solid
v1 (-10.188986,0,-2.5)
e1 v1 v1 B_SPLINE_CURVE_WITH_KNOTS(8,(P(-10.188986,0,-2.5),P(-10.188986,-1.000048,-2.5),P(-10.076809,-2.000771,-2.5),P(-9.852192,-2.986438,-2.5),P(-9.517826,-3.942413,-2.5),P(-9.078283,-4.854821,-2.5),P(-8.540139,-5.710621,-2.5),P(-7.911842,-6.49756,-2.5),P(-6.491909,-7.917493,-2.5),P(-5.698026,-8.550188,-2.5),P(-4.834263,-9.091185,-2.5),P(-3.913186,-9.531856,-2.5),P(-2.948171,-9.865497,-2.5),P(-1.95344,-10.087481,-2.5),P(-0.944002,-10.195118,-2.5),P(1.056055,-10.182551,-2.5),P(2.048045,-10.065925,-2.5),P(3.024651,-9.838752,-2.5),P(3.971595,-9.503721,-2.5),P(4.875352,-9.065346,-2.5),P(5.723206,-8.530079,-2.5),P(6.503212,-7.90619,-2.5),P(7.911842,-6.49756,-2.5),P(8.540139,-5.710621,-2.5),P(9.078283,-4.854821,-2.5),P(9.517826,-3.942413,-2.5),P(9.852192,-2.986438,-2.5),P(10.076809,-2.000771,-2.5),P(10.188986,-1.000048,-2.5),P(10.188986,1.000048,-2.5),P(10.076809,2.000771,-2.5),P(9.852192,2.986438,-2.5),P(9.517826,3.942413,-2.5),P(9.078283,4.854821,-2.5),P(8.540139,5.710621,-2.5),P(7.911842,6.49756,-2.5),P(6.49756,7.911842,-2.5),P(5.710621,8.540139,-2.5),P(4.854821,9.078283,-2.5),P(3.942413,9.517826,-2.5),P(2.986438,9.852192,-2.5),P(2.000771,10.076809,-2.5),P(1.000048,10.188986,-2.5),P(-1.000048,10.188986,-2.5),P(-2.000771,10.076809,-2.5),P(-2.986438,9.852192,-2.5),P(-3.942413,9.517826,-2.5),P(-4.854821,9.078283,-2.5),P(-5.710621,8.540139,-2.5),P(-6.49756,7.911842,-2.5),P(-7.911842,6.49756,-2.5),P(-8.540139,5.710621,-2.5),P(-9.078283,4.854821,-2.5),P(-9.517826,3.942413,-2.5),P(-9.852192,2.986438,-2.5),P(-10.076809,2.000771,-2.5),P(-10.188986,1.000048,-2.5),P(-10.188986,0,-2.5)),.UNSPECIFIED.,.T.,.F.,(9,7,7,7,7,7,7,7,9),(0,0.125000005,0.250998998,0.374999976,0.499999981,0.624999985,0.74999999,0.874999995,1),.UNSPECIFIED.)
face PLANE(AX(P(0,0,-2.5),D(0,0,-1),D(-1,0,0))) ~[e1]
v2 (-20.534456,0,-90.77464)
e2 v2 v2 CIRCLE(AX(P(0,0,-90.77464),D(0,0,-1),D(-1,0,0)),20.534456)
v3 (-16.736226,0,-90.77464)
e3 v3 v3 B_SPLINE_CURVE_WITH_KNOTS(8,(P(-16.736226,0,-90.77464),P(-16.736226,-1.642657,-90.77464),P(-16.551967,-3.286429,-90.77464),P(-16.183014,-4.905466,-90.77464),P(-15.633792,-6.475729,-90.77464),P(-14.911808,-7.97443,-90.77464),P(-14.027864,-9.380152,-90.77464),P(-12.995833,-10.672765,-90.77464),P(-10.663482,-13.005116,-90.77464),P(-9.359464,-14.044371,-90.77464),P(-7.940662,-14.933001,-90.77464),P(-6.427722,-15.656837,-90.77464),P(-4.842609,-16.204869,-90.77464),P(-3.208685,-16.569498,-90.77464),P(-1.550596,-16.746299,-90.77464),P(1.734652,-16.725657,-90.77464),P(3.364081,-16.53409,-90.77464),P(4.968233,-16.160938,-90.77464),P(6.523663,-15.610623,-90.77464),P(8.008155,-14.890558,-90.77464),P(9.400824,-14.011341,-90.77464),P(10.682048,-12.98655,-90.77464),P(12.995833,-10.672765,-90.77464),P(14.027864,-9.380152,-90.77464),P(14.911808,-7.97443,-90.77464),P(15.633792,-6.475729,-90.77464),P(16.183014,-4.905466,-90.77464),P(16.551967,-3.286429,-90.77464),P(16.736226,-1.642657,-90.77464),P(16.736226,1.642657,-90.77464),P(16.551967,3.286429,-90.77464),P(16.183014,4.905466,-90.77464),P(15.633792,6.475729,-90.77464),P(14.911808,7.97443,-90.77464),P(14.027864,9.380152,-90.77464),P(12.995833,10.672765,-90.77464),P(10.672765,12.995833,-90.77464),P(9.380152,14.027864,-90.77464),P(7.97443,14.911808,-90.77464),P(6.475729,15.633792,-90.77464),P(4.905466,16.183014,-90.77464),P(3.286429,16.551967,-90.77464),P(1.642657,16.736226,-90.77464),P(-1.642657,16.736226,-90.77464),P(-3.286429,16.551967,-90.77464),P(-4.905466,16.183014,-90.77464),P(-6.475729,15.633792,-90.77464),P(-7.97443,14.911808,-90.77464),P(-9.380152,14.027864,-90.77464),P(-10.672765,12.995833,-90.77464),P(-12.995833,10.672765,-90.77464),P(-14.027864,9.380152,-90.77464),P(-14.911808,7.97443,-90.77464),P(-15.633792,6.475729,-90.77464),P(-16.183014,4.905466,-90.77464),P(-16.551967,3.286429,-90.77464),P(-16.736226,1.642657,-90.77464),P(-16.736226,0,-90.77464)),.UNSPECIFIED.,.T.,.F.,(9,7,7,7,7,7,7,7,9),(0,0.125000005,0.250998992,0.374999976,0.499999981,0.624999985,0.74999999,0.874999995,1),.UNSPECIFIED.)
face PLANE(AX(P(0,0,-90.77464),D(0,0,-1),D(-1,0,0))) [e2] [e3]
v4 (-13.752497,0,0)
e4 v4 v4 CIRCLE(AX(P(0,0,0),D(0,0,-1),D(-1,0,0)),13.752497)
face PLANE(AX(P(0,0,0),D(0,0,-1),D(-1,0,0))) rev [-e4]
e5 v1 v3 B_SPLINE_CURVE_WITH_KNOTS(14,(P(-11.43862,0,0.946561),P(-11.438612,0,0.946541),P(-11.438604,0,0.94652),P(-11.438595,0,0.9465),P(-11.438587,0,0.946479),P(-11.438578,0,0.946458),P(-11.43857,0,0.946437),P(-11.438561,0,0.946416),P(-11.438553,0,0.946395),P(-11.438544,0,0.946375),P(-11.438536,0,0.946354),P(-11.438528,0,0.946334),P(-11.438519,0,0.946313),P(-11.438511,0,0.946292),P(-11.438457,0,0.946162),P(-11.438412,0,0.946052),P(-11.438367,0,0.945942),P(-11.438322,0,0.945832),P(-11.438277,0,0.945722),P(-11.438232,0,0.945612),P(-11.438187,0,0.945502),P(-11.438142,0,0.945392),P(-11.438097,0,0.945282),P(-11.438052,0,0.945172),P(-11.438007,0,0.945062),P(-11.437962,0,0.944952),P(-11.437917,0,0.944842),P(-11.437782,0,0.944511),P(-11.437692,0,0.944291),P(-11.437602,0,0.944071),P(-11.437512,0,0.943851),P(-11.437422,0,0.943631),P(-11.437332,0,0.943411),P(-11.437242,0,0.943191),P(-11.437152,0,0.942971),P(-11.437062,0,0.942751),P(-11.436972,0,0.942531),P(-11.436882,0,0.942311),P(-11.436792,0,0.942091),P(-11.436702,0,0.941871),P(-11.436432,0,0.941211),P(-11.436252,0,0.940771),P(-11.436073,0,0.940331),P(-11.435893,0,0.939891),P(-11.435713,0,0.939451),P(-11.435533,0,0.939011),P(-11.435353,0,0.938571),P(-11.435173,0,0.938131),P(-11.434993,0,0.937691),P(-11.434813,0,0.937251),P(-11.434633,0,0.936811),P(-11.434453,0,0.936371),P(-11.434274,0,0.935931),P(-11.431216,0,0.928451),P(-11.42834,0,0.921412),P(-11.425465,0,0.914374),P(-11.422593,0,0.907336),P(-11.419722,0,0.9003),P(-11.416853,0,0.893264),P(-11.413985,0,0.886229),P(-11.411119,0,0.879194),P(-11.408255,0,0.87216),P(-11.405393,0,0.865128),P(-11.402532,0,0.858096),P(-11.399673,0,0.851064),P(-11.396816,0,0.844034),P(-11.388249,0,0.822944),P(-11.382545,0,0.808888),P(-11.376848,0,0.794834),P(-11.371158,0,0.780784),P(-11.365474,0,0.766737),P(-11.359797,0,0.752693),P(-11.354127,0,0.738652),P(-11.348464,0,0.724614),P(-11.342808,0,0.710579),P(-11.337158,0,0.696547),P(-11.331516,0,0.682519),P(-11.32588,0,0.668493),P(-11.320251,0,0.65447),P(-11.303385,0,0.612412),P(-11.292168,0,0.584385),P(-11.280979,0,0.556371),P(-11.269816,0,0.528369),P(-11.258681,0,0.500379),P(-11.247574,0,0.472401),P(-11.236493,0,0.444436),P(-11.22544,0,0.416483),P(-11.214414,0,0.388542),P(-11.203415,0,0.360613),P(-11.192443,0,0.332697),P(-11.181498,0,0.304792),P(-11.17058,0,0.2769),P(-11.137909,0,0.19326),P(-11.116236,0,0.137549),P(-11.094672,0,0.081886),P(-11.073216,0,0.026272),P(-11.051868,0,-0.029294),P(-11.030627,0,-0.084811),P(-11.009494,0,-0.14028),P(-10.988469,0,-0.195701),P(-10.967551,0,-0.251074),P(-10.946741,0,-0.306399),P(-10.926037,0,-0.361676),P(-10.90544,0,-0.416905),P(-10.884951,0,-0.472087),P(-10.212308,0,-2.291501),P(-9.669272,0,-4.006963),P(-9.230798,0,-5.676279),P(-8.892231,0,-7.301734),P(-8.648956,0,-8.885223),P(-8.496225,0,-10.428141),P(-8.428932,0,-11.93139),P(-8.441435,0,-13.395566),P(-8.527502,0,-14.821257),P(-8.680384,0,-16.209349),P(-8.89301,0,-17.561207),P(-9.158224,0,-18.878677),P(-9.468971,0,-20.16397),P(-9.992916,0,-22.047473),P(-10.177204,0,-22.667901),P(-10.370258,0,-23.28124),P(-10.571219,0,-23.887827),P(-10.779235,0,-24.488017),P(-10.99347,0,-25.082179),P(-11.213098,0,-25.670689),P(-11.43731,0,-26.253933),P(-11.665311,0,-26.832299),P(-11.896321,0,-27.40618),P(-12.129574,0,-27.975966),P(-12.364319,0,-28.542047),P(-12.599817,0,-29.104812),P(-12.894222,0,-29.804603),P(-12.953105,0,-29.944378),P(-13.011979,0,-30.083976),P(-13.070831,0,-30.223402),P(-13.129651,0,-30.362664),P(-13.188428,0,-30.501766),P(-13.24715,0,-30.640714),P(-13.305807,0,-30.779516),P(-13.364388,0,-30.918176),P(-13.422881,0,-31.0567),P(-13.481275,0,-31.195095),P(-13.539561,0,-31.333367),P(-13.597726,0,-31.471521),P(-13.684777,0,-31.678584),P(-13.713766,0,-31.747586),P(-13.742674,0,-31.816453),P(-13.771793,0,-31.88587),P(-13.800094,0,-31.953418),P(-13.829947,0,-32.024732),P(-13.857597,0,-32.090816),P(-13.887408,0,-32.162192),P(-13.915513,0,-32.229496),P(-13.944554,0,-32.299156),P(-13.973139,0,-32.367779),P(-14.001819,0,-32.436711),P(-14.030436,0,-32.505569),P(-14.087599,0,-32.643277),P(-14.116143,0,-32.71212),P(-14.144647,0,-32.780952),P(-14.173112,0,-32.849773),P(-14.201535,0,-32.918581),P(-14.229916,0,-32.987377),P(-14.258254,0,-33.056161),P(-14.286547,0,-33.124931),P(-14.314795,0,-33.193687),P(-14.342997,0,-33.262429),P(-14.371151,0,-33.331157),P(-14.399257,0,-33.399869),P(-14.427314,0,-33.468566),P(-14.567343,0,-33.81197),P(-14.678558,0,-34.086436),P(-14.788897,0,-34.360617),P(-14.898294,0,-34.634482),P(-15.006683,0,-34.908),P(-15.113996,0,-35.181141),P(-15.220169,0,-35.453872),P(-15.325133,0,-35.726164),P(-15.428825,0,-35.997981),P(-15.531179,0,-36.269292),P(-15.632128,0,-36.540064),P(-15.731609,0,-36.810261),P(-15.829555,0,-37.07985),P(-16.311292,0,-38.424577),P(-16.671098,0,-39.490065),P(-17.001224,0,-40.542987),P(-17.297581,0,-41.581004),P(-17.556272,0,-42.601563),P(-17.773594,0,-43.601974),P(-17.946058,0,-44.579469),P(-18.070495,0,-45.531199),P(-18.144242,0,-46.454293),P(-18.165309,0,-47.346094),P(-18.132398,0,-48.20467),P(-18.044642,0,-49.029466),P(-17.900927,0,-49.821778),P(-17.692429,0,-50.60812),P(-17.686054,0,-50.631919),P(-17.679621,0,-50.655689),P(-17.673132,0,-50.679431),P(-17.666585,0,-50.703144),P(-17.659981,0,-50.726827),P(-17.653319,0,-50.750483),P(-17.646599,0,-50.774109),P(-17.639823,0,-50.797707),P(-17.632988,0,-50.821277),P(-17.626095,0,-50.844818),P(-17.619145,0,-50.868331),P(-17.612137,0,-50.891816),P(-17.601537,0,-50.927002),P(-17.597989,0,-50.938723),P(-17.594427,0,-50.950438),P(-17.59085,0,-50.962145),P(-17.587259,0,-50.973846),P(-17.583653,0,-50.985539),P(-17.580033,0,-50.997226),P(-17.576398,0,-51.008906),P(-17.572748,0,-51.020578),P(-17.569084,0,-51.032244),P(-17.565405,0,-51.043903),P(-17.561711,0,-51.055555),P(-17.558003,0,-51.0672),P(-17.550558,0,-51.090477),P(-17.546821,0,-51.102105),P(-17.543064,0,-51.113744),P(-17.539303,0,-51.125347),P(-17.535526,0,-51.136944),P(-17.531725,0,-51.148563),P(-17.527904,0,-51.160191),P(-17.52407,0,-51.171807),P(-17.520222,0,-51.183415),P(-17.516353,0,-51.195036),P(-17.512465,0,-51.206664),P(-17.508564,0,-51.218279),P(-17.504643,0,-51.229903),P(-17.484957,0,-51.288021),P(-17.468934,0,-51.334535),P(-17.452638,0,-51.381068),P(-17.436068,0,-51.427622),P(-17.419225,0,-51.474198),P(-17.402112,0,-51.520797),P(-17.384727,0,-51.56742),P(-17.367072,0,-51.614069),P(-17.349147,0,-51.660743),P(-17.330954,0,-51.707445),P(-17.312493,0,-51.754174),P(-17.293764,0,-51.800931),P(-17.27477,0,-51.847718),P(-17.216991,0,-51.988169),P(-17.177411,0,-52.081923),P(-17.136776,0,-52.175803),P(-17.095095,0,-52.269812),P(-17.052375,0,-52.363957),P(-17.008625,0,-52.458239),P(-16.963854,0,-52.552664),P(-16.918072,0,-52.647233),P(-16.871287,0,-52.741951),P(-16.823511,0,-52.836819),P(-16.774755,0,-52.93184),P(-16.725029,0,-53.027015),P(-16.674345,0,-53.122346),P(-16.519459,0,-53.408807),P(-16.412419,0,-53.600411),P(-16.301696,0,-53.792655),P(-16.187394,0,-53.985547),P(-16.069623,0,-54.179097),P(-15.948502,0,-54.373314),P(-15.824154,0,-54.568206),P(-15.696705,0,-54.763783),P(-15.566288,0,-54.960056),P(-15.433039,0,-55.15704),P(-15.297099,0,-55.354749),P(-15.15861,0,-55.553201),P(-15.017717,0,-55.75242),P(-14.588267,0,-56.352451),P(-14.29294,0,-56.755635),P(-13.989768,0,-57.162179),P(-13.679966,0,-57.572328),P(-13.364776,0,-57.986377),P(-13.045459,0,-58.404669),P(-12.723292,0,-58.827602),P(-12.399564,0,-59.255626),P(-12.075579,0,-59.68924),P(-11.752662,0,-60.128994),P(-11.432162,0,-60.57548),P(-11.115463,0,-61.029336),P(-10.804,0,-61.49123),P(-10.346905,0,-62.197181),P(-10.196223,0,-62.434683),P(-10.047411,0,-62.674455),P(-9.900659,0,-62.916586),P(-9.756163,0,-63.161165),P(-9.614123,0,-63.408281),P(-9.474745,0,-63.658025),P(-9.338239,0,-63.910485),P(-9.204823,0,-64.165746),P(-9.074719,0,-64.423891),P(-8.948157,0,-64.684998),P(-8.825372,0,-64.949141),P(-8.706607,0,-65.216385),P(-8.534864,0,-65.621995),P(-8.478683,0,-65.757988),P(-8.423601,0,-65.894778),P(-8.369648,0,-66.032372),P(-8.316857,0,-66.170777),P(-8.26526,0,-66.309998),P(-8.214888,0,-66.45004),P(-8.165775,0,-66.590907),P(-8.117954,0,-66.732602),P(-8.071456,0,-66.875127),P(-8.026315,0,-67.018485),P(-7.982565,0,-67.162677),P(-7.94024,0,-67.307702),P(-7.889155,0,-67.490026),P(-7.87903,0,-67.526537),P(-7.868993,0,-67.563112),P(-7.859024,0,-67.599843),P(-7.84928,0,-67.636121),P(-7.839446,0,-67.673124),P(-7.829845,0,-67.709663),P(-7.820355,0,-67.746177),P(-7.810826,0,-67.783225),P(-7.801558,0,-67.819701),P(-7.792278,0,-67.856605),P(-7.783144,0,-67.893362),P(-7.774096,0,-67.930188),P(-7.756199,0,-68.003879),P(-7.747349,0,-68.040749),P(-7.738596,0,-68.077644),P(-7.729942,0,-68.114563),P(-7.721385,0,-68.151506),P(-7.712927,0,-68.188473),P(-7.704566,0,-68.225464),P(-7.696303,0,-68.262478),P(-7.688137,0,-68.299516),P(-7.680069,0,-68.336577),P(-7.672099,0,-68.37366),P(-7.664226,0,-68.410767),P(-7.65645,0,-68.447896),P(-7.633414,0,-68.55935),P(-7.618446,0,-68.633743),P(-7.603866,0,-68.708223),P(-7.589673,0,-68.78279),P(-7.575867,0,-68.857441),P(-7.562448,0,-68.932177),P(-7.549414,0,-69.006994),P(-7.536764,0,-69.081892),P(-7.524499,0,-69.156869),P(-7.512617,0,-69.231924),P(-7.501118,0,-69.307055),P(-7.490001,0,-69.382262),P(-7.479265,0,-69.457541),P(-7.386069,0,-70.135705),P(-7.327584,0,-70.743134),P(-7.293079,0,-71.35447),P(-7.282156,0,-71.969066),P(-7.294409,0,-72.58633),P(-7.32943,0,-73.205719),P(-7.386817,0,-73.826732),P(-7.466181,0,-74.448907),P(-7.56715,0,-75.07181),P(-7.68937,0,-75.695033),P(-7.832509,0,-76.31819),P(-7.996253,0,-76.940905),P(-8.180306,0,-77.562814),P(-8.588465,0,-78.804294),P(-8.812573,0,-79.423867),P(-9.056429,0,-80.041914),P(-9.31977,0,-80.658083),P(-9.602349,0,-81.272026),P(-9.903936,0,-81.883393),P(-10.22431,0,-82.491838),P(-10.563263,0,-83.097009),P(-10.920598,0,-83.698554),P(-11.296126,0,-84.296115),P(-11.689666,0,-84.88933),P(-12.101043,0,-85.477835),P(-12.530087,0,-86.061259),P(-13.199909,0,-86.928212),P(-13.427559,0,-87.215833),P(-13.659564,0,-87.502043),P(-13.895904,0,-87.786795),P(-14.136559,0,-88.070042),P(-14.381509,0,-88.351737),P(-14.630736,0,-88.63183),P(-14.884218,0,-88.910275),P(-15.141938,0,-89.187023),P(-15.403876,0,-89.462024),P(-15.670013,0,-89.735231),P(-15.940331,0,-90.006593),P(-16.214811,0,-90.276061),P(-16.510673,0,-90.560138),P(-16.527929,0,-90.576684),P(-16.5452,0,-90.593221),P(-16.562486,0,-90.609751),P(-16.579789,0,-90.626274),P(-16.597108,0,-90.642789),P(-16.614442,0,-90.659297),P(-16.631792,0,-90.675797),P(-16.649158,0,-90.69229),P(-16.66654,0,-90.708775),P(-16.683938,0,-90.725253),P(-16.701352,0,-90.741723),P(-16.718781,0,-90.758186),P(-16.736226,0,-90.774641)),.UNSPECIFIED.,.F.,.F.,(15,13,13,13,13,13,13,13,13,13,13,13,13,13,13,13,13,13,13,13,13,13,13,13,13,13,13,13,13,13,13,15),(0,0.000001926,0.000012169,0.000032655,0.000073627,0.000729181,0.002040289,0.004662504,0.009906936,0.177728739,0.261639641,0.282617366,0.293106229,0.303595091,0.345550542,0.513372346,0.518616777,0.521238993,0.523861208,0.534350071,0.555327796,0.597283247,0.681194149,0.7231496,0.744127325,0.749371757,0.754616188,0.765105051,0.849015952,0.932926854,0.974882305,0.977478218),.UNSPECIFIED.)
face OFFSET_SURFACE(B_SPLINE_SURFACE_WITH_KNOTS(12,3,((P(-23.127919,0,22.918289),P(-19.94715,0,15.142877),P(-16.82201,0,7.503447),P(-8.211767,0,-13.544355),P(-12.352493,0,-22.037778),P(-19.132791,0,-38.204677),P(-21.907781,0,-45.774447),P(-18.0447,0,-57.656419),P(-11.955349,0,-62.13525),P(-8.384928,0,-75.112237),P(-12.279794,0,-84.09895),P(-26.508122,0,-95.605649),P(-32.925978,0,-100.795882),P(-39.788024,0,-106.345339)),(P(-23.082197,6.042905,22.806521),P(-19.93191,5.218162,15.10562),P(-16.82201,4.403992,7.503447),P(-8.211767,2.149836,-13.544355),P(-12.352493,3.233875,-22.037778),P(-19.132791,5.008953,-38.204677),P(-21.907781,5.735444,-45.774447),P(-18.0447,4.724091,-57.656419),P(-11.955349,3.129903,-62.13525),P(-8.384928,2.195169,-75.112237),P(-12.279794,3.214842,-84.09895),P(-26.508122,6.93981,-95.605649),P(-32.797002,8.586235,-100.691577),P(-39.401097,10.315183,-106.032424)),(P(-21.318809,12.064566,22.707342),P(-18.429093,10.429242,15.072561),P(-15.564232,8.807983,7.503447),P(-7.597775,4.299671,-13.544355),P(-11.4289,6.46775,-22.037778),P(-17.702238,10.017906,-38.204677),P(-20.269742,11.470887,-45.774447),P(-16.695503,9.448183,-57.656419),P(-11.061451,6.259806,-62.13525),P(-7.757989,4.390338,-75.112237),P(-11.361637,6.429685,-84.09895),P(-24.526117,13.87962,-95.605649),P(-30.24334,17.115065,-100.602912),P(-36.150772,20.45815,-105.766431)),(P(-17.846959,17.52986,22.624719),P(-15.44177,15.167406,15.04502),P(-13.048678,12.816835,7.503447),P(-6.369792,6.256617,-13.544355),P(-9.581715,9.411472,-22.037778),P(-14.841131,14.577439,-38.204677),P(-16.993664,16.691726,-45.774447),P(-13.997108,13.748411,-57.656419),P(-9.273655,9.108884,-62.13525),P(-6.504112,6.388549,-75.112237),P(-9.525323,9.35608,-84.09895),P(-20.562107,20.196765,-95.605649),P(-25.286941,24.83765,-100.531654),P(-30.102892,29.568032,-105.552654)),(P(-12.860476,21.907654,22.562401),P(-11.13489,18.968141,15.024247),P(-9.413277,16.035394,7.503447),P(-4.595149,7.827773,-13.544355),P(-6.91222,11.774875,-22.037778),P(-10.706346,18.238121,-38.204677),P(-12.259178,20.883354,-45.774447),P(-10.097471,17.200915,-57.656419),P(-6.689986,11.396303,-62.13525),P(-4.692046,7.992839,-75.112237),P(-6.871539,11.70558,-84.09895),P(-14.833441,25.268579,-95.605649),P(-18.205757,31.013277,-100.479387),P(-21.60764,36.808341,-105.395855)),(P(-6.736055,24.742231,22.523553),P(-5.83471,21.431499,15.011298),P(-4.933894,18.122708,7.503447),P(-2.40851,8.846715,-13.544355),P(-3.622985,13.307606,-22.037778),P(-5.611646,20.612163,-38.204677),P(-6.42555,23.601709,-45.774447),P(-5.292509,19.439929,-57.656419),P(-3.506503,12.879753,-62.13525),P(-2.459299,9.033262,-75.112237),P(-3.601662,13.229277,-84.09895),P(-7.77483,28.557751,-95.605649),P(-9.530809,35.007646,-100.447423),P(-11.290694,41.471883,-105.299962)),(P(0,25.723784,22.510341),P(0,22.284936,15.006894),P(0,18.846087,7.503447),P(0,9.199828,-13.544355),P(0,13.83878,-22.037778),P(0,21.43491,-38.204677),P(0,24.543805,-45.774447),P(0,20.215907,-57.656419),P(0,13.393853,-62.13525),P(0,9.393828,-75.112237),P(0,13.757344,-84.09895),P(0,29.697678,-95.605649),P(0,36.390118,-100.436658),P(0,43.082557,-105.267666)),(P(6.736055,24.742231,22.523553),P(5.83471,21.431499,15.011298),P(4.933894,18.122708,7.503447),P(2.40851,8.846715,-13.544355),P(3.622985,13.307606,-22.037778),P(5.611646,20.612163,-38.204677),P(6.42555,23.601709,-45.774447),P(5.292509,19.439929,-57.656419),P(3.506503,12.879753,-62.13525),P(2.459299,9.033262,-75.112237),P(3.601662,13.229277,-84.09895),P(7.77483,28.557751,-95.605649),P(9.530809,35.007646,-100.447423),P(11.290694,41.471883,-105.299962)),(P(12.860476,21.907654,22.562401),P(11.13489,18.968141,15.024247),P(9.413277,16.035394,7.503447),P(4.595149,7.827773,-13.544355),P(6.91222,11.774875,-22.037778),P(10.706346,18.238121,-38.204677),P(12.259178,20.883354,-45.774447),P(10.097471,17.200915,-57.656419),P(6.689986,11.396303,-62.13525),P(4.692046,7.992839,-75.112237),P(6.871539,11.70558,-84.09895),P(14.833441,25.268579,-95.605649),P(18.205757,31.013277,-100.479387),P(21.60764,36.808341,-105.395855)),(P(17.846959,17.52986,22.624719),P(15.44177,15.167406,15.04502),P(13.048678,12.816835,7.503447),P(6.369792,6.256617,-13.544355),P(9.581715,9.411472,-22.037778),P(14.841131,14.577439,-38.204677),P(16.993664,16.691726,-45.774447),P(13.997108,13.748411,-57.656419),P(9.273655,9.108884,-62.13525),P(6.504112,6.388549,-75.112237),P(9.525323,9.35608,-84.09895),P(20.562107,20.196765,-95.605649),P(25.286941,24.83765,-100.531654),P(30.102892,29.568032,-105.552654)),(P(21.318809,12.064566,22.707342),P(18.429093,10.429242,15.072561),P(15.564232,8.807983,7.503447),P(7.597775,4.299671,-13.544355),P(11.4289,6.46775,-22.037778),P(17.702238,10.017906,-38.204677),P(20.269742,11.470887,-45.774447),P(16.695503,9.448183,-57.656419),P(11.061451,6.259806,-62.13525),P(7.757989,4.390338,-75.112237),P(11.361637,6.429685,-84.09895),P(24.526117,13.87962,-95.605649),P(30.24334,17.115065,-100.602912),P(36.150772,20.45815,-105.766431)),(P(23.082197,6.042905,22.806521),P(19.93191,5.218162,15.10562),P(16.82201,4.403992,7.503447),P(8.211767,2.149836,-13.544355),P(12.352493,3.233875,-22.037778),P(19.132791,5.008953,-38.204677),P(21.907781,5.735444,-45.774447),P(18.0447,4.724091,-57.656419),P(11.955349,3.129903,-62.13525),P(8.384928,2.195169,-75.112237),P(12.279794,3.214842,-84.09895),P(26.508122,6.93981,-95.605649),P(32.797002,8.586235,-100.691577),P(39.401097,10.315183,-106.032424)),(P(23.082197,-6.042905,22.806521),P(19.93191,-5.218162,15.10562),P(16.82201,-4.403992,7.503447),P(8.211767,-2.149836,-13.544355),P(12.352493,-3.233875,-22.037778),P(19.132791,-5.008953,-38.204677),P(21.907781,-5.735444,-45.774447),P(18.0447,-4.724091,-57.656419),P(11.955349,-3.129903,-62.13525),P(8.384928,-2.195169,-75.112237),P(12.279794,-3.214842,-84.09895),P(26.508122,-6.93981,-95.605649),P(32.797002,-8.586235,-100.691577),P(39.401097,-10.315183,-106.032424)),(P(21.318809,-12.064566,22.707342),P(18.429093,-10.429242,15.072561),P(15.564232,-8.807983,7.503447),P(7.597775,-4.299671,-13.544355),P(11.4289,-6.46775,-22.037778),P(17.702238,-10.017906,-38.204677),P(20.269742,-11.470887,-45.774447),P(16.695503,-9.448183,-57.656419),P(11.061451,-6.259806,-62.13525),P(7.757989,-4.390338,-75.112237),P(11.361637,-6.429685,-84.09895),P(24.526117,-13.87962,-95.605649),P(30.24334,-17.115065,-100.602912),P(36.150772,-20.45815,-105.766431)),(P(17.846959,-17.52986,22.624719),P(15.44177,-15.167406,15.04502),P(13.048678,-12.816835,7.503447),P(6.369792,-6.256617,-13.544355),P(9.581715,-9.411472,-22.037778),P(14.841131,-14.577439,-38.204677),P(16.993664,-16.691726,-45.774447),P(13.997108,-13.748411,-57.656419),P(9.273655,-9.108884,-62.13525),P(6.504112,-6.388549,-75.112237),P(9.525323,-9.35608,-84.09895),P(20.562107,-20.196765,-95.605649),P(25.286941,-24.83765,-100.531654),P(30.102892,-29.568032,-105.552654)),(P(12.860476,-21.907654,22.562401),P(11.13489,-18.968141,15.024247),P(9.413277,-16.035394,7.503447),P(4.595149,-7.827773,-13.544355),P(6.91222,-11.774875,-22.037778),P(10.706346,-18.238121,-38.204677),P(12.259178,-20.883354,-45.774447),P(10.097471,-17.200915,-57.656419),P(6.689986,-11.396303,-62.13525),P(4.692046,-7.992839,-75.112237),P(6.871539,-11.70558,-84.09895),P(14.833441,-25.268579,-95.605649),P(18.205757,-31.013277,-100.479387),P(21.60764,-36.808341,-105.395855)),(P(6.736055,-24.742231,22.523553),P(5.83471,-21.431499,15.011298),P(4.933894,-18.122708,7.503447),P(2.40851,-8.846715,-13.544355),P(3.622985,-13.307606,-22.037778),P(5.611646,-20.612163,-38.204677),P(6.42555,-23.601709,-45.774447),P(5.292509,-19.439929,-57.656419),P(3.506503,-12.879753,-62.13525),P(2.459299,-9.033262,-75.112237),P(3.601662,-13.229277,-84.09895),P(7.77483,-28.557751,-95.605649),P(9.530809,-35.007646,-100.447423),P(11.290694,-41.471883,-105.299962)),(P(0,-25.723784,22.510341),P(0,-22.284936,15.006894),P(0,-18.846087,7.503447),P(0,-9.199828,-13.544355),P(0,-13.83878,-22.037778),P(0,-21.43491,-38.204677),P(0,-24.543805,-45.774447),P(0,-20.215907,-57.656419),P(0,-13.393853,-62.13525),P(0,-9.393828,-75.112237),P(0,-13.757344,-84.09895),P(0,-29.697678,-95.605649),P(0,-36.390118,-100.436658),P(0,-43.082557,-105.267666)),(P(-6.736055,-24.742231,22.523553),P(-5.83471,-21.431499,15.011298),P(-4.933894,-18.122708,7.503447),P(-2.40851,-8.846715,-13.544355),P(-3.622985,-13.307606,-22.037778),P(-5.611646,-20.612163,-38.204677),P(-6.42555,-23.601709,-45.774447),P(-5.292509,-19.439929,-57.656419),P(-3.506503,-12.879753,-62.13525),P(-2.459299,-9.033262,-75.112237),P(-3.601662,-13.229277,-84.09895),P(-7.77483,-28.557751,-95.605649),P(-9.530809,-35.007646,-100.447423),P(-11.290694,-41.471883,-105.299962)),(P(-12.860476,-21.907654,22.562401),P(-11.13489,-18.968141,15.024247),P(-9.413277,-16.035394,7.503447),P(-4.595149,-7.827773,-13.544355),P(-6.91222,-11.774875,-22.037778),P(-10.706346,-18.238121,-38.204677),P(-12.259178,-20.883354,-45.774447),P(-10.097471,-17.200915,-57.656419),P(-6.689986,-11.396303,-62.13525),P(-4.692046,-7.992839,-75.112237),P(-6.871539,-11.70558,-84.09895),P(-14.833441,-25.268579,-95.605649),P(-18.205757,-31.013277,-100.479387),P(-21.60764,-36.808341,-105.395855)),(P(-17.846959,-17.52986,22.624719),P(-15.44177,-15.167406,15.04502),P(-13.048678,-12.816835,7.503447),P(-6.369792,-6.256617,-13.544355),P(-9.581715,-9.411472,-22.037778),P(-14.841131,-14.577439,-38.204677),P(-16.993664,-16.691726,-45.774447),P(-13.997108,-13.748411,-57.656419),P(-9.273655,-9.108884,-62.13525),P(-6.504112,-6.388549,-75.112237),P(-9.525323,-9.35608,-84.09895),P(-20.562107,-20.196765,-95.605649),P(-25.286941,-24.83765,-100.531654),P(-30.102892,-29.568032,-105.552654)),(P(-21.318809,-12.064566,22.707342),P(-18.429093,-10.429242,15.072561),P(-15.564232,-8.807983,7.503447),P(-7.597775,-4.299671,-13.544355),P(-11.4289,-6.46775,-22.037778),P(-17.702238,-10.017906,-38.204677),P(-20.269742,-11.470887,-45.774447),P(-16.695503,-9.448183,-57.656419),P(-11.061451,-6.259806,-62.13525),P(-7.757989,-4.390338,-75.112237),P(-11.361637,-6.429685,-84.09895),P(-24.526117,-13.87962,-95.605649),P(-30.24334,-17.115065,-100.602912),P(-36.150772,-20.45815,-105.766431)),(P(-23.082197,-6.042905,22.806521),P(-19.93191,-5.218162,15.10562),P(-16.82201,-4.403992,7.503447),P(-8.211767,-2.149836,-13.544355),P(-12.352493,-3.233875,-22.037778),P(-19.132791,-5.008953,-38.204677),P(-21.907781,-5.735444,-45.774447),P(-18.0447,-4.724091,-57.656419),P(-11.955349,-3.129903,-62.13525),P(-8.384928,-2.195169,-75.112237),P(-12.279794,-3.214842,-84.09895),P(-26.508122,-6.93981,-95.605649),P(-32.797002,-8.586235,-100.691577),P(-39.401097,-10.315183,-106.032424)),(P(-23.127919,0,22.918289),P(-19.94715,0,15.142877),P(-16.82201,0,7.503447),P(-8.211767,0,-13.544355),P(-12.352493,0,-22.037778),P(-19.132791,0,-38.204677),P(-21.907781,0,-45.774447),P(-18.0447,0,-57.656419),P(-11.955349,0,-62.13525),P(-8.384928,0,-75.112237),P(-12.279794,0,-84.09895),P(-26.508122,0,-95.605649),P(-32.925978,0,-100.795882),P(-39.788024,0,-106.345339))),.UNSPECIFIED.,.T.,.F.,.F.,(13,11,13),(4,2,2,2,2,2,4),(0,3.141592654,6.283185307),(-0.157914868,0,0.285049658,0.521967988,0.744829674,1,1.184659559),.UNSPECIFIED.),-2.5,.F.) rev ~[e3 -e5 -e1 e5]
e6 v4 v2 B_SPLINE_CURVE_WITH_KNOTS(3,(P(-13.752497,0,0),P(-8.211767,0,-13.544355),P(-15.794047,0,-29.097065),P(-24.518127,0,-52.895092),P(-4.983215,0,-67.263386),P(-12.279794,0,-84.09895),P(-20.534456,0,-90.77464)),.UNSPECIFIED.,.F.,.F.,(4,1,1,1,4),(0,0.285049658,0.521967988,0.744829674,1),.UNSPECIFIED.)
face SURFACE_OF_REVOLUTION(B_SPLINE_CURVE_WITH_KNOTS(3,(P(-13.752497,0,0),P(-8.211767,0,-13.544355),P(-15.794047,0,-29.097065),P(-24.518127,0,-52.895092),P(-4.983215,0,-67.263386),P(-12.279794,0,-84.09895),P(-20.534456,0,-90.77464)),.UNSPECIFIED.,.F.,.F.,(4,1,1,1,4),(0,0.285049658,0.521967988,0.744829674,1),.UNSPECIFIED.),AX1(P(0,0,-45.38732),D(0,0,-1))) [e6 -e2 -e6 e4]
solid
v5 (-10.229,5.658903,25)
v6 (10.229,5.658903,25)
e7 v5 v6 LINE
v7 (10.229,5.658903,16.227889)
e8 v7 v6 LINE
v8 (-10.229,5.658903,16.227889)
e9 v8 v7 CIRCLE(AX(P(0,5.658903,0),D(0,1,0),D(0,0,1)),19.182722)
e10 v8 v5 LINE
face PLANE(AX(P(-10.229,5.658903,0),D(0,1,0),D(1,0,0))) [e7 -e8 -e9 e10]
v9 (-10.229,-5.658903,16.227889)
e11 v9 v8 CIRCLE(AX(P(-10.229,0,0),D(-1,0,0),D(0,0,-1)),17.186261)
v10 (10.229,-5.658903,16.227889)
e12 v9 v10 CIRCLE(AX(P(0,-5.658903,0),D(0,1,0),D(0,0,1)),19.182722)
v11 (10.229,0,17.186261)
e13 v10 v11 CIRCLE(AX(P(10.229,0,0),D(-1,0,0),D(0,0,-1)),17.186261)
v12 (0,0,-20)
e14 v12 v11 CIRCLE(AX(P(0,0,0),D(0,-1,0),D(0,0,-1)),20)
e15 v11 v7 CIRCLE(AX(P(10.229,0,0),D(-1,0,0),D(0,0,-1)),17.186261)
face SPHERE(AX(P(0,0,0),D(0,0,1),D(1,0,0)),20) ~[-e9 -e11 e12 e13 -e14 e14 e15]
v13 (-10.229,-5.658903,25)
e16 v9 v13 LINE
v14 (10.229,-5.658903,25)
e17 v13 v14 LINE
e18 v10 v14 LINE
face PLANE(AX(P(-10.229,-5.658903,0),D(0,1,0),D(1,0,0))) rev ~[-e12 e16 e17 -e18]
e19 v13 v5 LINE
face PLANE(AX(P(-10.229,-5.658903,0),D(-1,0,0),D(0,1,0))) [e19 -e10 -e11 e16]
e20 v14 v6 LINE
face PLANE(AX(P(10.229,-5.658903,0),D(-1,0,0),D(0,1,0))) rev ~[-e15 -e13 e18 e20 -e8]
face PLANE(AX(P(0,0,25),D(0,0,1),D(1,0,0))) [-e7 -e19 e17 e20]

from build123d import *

# Parameters (mm, degrees)
F2_W     = 20.458
F2_H     = 11.3178063184
F3_DEPTH = 25
F10_T    = -2.5


# Not quite as in the source:
# - the program builds the solid bodies; features that only make, move or delete a surface that nothing else refers to are left out


with BuildPart() as f1:
    # F0 (on Front) → F1 (revolve)
    with BuildSketch(Plane.XZ):
        with BuildLine():
            Line((0, 20), (0, -20))
            ThreePointArc((0, -20), (20, 0), (0, 20))
        make_face()
    revolve(axis=Axis((0, 0, 0), (0, 0, -1)))

    # F2 (on Top) → F3 (join)
    with BuildSketch(Plane.XY):
        Rectangle(F2_W, F2_H)
    extrude(amount=F3_DEPTH)


with BuildPart() as f5:
    # F4 (on Front) → F5 (revolve)
    with BuildSketch(Plane.XZ):
        with BuildLine():
            Line((0, 0), (-13.7524965748, 0))
            add(Edge.make_bspline(
                [(-13.7524965748, 0), (-8.2117667219, -13.5443547456), (-15.7940470288, -29.097065496), (-24.5181266702, -52.895092497), (-4.983214771, -67.2633857979), (-12.2797935148, -84.0989501471), (-20.5344557762, -90.7746404409)],
                knots=[0, 0, 0, 0, 0.2850496582, 0.5219679881, 0.7448296737, 1, 1, 1, 1], degree=3))
            Line((-20.5344557762, -90.7746404409), (0, -90.7746404409))
            Line((0, -90.7746404409), (0, 0))
        make_face()
    revolve(axis=Axis((0, 0, -45.3873202205), (0, 0, -1)))

    # F10
    f10_openings = [f5.faces().sort_by_distance(p)[0] for p in [
        (0, 0, -90.77464),
    ]]
    offset(amount=F10_T, openings=f10_openings)


solid = Compound([f1.part, f5.part])
